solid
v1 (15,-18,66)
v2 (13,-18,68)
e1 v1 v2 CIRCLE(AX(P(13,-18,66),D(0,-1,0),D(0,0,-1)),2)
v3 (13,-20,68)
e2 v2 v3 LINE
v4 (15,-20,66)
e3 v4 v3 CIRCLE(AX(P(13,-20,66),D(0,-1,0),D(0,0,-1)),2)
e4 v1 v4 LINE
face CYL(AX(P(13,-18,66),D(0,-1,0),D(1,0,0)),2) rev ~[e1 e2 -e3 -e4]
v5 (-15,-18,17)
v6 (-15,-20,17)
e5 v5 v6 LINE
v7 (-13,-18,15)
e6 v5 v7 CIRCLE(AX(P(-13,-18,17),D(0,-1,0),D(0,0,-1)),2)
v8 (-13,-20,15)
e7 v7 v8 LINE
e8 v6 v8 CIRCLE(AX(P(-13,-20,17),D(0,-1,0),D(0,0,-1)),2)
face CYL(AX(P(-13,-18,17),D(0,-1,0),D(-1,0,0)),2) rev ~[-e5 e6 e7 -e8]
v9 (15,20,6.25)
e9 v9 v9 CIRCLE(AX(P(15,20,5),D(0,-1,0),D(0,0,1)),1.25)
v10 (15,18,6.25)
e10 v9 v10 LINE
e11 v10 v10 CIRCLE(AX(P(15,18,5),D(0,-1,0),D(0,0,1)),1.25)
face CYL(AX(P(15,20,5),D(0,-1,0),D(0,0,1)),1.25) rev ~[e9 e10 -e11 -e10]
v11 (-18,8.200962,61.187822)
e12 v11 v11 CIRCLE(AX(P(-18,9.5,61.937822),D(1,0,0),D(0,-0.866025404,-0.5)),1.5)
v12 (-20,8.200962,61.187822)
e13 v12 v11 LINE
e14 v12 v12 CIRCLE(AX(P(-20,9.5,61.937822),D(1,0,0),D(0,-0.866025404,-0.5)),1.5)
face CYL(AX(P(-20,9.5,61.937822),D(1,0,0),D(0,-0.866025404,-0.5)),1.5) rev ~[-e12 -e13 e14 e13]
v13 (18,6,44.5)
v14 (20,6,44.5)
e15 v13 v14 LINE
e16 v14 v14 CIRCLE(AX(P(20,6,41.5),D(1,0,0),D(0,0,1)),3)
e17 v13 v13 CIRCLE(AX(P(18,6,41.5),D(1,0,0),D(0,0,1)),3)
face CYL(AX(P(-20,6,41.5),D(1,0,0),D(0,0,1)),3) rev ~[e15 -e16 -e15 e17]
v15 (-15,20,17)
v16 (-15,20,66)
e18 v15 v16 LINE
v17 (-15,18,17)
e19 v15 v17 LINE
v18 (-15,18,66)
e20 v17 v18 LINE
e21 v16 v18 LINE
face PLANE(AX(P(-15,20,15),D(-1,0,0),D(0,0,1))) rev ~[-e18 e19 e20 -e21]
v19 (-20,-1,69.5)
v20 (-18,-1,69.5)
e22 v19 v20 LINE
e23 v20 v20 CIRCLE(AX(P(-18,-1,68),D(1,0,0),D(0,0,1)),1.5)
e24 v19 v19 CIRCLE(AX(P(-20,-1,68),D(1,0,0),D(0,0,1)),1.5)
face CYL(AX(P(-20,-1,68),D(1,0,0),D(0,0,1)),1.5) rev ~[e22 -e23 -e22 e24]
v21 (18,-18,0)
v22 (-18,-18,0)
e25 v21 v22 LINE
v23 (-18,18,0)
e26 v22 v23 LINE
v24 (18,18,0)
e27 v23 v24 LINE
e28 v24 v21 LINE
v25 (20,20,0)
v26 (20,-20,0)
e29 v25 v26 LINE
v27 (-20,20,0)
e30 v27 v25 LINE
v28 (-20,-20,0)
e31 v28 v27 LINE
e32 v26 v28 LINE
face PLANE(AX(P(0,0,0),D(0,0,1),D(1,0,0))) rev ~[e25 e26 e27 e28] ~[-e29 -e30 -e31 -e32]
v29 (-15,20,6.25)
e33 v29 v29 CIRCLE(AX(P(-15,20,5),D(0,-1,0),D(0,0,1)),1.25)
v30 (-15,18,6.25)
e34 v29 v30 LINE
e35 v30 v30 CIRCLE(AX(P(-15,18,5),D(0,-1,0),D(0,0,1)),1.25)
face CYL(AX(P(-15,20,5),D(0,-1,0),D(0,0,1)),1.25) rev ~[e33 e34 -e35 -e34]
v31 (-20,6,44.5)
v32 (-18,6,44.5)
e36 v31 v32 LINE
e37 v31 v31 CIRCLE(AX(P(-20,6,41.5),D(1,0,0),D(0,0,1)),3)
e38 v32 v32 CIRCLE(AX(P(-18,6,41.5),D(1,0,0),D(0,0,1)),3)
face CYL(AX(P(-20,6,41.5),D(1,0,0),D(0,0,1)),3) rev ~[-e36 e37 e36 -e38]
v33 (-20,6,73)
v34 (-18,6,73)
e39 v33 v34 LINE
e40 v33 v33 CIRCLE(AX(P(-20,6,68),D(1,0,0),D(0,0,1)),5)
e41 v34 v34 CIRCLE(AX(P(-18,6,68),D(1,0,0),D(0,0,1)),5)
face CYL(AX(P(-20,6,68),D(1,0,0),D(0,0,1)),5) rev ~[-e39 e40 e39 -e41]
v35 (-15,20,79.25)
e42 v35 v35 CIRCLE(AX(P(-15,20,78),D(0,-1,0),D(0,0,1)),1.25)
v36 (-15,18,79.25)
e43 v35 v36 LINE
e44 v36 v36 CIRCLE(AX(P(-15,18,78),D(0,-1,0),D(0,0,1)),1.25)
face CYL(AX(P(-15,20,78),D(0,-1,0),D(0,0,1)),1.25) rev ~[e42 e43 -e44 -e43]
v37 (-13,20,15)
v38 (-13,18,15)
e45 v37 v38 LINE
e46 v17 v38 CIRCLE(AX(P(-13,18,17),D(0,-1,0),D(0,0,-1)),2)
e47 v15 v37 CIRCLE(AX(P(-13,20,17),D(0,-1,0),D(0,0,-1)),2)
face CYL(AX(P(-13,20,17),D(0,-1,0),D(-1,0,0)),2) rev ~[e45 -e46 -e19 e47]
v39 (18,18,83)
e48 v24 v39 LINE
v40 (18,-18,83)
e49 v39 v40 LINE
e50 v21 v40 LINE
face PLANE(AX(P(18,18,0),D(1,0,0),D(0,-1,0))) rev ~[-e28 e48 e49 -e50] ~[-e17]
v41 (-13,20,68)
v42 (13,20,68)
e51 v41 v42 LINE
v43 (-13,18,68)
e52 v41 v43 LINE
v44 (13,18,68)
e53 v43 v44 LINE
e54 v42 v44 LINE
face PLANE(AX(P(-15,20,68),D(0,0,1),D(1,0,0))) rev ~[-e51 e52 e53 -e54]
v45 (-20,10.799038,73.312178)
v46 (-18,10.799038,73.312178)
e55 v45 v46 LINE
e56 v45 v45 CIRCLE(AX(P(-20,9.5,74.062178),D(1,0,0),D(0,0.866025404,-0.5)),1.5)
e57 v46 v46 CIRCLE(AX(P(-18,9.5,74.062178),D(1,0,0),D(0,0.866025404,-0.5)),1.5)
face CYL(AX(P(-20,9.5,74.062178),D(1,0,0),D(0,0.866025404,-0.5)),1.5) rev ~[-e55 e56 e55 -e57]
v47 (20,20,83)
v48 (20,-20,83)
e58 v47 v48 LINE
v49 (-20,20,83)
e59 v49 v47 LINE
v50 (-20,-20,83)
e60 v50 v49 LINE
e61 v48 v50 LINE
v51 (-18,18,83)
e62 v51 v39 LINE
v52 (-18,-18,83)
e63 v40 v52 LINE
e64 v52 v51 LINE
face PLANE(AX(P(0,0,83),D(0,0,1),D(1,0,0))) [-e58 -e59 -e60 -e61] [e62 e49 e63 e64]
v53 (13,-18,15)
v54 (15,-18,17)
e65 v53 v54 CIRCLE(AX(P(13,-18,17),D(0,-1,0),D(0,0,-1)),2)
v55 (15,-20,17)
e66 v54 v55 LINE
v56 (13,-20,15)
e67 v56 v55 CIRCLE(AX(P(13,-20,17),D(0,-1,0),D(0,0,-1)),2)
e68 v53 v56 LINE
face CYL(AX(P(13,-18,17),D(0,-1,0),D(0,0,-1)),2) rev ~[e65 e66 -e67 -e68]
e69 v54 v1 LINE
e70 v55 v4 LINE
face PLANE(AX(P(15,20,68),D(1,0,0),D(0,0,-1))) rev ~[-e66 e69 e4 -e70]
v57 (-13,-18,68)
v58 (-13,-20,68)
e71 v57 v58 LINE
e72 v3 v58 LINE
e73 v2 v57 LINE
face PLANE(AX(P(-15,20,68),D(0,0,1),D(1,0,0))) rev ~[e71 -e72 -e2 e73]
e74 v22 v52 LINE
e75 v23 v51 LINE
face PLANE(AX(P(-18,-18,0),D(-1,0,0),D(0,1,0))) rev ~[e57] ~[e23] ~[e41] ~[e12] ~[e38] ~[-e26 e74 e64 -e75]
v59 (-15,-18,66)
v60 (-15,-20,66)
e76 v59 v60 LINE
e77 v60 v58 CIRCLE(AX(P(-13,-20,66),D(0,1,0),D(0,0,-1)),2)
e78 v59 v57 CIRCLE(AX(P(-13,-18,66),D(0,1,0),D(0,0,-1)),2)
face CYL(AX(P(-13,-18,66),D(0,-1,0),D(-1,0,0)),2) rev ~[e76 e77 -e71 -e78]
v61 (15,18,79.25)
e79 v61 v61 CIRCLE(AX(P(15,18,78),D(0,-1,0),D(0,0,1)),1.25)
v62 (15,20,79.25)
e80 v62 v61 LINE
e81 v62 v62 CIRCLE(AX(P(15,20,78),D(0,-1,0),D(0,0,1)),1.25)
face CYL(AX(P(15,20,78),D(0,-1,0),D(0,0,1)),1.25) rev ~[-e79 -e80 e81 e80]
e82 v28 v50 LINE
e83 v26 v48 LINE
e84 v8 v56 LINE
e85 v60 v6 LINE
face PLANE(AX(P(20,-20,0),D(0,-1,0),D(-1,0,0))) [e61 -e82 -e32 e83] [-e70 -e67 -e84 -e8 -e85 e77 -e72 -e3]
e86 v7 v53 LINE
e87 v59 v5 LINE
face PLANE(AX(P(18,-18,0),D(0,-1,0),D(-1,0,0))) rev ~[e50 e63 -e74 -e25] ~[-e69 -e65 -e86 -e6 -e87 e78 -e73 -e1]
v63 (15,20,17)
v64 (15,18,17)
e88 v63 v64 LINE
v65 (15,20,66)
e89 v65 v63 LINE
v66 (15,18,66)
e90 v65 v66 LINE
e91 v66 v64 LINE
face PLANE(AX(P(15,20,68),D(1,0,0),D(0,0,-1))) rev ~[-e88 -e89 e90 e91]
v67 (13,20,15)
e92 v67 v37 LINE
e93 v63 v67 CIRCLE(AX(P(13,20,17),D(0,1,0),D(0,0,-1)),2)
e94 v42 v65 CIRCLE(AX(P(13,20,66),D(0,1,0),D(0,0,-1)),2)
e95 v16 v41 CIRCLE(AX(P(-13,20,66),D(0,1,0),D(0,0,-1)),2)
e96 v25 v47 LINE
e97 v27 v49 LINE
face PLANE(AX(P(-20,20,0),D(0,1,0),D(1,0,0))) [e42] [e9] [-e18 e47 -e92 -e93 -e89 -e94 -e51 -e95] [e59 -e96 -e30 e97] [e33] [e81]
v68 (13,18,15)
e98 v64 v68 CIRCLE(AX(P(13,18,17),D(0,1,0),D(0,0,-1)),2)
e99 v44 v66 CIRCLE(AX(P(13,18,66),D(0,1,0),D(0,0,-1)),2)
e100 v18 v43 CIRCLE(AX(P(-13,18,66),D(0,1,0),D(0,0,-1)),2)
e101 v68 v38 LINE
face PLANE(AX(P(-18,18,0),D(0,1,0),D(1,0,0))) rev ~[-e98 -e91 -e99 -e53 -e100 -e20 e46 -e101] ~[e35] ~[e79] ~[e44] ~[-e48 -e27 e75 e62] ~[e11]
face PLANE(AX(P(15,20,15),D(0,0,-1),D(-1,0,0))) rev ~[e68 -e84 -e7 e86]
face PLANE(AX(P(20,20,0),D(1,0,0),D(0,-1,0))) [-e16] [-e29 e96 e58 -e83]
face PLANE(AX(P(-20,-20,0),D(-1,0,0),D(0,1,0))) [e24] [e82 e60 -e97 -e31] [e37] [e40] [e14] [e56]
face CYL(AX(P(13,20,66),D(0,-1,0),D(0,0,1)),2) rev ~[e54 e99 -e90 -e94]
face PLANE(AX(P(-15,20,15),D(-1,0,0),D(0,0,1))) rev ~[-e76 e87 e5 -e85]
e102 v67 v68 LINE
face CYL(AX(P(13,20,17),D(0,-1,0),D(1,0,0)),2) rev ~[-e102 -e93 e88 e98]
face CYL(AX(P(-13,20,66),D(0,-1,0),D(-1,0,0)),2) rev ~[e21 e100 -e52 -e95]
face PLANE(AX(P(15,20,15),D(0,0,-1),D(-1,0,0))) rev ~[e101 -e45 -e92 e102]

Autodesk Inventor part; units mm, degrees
ref_plane "YZ Plane" through (0, 0, 0) normal (1, 0, 0) x (0, 1, 0)
ref_plane "XZ Plane" through (0, 0, 0) normal (0, 1, 0) x (-1, 0, 0)
ref_plane "XY Plane" through (0, 0, 0) normal (0, 0, 1) x (1, 0, 0)
sketch "スケッチ1" plane through (0, 0, 0) normal (0, 0, 1) x (1, 0, 0)
  line L0 (-20, 20) -> (20, 20)
  line L1 (20, 20) -> (20, -20)
  line L2 (20, -20) -> (-20, -20)
  line L3 (-20, -20) -> (-20, 20)
  line L4 (-20, 20) -> (20, -20) construction
  line L5 (20, 20) -> (-20, -20) construction
  line L6 (-18, 18) -> (18, 18)
  line L7 (18, 18) -> (18, -18)
  line L8 (18, -18) -> (-18, -18)
  line L9 (-18, -18) -> (-18, 18)
  line L10 (-18, 18) -> (18, -18) construction
  line L11 (18, 18) -> (-18, -18) construction
  point P0 (0, 0)
  point P1 (0, 0)
  dimension "d0" = 40
  dimension "d1" = 40
  dimension "d2" = 2
  dimension "d3" = 2
extrude "押し出し1" add sketch "スケッチ1" along normal blind 83
sketch "スケッチ3" plane through (-20, 20, 0) normal (0, 1, 0) x (1, 0, 0)
  line L0 (5, -68) -> (35, -68)
  line L1 (35, -68) -> (35, -15)
  line L2 (35, -15) -> (5, -15)
  line L3 (5, -15) -> (5, -68)
  line L4 (40, -83) -> (0, -83) projected
  line L5 (0, 0) -> (40, 0) projected
  line L6 (40, 0) -> (40, -83) projected
  line L7 (0, 0) -> (0, -83) projected
  point P0 (20, 0)
  dimension "d6" = 15
  dimension "d7" = 15
  dimension "d8" = 5
  dimension "d9" = 5
extrude "押し出し2" cut sketch "スケッチ3" against normal blind 100 contours L3 L2 L1 L0
fillet "フィレット1" radius 2 8 edges at (-15, 19, 68) (-15, 19, 15) (15, 19, 15) (15, 19, 68) (15, -19, 68) (-15, -19, 68) (-15, -19, 15) (15, -19, 15)
sketch "スケッチ4" plane through (-20, 20, 0) normal (0, 1, 0) x (1, 0, 0)
  line L0 (0, 0) -> (0, -83) projected
  line L1 (0, 0) -> (40, 0) projected
  line L2 (40, 0) -> (40, -83) projected
  line L3 (40, -83) -> (0, -83) projected
  point P0 (20, 0)
  point P1 (5, -5)
  point P2 (5, -78)
  point P3 (35, -78)
  point P4 (35, -5)
  dimension "d13" = 5
  dimension "d14" = 5
  dimension "d15" = 5
  dimension "d16" = 5
  dimension "d17" = 5
  dimension "d18" = 5
  dimension "d19" = 5
  dimension "d20" = 5
hole "穴1" at (-15, 20, 5) at (-15, 20, 78) at (15, 20, 78) at (15, 20, 5) direction (0, -1, 0) diameter 2.5 end up to surface
thread "ねじ1" size "M2.5x0.45" class "6H" standard "ANSI Metric M Profile" full length
thread "ねじ2" size "M2.5x0.45" class "6H" standard "ANSI Metric M Profile" full length
thread "ねじ3" size "M2.5x0.45" class "6H" standard "ANSI Metric M Profile" full length
thread "ねじ4" size "M2.5x0.45" class "6H" standard "ANSI Metric M Profile" full length
sketch "スケッチ6" plane through (-20, -20, 0) normal (-1, 0, 0) x (0, 0, 1)
  line L0 (0, 0) -> (0, 40) projected
  line L1 (0, 40) -> (83, 40) projected
  line L2 (83, 40) -> (83, 0) projected
  point P0 (0, 20)
  point P1 (68, 26)
  dimension "d46" = 14
  dimension "d54" = 15
hole "穴3" at (-20, 6, 68) direction (1, 0, 0) diameter 10 depth 8
sketch "スケッチ7" plane through (-20, -20, 0) normal (-1, 0, 0) x (0, 0, 1)
  line L0 (0, 40) -> (83, 40) projected
  line L1 (83, 40) -> (83, 0) projected
  point P0 (0, 20)
  point P1 (68, 19)
  dimension "d55" = 21
  dimension "d56" = 15
hole "穴4" at (-20, -1, 68) direction (1, 0, 0) diameter 3 depth 8
pattern_circular "円形状パターン1" count 3 over 360 about axis through (-16, 6, 68) along (-1, 0, 0) of "穴4"
sketch "スケッチ8" plane through (-20, -20, 0) normal (-1, 0, 0) x (0, 0, 1)
  line L0 (83, 40) -> (83, 0) projected
  line L1 (0, 0) -> (83, 0) projected
  line L2 (0, 40) -> (83, 40) projected
  circle A0 centre (68, 26) radius 5 projected
  point P0 (0, 20)
  point P1 (41.5, 26)
  dimension "d77" = 14
  dimension "d78" = 26.5
hole "穴5" at (-20, 6, 41.5) direction (1, 0, 0) diameter 6 end through all
properties part number "Gear box改" material "アルミニウム"
